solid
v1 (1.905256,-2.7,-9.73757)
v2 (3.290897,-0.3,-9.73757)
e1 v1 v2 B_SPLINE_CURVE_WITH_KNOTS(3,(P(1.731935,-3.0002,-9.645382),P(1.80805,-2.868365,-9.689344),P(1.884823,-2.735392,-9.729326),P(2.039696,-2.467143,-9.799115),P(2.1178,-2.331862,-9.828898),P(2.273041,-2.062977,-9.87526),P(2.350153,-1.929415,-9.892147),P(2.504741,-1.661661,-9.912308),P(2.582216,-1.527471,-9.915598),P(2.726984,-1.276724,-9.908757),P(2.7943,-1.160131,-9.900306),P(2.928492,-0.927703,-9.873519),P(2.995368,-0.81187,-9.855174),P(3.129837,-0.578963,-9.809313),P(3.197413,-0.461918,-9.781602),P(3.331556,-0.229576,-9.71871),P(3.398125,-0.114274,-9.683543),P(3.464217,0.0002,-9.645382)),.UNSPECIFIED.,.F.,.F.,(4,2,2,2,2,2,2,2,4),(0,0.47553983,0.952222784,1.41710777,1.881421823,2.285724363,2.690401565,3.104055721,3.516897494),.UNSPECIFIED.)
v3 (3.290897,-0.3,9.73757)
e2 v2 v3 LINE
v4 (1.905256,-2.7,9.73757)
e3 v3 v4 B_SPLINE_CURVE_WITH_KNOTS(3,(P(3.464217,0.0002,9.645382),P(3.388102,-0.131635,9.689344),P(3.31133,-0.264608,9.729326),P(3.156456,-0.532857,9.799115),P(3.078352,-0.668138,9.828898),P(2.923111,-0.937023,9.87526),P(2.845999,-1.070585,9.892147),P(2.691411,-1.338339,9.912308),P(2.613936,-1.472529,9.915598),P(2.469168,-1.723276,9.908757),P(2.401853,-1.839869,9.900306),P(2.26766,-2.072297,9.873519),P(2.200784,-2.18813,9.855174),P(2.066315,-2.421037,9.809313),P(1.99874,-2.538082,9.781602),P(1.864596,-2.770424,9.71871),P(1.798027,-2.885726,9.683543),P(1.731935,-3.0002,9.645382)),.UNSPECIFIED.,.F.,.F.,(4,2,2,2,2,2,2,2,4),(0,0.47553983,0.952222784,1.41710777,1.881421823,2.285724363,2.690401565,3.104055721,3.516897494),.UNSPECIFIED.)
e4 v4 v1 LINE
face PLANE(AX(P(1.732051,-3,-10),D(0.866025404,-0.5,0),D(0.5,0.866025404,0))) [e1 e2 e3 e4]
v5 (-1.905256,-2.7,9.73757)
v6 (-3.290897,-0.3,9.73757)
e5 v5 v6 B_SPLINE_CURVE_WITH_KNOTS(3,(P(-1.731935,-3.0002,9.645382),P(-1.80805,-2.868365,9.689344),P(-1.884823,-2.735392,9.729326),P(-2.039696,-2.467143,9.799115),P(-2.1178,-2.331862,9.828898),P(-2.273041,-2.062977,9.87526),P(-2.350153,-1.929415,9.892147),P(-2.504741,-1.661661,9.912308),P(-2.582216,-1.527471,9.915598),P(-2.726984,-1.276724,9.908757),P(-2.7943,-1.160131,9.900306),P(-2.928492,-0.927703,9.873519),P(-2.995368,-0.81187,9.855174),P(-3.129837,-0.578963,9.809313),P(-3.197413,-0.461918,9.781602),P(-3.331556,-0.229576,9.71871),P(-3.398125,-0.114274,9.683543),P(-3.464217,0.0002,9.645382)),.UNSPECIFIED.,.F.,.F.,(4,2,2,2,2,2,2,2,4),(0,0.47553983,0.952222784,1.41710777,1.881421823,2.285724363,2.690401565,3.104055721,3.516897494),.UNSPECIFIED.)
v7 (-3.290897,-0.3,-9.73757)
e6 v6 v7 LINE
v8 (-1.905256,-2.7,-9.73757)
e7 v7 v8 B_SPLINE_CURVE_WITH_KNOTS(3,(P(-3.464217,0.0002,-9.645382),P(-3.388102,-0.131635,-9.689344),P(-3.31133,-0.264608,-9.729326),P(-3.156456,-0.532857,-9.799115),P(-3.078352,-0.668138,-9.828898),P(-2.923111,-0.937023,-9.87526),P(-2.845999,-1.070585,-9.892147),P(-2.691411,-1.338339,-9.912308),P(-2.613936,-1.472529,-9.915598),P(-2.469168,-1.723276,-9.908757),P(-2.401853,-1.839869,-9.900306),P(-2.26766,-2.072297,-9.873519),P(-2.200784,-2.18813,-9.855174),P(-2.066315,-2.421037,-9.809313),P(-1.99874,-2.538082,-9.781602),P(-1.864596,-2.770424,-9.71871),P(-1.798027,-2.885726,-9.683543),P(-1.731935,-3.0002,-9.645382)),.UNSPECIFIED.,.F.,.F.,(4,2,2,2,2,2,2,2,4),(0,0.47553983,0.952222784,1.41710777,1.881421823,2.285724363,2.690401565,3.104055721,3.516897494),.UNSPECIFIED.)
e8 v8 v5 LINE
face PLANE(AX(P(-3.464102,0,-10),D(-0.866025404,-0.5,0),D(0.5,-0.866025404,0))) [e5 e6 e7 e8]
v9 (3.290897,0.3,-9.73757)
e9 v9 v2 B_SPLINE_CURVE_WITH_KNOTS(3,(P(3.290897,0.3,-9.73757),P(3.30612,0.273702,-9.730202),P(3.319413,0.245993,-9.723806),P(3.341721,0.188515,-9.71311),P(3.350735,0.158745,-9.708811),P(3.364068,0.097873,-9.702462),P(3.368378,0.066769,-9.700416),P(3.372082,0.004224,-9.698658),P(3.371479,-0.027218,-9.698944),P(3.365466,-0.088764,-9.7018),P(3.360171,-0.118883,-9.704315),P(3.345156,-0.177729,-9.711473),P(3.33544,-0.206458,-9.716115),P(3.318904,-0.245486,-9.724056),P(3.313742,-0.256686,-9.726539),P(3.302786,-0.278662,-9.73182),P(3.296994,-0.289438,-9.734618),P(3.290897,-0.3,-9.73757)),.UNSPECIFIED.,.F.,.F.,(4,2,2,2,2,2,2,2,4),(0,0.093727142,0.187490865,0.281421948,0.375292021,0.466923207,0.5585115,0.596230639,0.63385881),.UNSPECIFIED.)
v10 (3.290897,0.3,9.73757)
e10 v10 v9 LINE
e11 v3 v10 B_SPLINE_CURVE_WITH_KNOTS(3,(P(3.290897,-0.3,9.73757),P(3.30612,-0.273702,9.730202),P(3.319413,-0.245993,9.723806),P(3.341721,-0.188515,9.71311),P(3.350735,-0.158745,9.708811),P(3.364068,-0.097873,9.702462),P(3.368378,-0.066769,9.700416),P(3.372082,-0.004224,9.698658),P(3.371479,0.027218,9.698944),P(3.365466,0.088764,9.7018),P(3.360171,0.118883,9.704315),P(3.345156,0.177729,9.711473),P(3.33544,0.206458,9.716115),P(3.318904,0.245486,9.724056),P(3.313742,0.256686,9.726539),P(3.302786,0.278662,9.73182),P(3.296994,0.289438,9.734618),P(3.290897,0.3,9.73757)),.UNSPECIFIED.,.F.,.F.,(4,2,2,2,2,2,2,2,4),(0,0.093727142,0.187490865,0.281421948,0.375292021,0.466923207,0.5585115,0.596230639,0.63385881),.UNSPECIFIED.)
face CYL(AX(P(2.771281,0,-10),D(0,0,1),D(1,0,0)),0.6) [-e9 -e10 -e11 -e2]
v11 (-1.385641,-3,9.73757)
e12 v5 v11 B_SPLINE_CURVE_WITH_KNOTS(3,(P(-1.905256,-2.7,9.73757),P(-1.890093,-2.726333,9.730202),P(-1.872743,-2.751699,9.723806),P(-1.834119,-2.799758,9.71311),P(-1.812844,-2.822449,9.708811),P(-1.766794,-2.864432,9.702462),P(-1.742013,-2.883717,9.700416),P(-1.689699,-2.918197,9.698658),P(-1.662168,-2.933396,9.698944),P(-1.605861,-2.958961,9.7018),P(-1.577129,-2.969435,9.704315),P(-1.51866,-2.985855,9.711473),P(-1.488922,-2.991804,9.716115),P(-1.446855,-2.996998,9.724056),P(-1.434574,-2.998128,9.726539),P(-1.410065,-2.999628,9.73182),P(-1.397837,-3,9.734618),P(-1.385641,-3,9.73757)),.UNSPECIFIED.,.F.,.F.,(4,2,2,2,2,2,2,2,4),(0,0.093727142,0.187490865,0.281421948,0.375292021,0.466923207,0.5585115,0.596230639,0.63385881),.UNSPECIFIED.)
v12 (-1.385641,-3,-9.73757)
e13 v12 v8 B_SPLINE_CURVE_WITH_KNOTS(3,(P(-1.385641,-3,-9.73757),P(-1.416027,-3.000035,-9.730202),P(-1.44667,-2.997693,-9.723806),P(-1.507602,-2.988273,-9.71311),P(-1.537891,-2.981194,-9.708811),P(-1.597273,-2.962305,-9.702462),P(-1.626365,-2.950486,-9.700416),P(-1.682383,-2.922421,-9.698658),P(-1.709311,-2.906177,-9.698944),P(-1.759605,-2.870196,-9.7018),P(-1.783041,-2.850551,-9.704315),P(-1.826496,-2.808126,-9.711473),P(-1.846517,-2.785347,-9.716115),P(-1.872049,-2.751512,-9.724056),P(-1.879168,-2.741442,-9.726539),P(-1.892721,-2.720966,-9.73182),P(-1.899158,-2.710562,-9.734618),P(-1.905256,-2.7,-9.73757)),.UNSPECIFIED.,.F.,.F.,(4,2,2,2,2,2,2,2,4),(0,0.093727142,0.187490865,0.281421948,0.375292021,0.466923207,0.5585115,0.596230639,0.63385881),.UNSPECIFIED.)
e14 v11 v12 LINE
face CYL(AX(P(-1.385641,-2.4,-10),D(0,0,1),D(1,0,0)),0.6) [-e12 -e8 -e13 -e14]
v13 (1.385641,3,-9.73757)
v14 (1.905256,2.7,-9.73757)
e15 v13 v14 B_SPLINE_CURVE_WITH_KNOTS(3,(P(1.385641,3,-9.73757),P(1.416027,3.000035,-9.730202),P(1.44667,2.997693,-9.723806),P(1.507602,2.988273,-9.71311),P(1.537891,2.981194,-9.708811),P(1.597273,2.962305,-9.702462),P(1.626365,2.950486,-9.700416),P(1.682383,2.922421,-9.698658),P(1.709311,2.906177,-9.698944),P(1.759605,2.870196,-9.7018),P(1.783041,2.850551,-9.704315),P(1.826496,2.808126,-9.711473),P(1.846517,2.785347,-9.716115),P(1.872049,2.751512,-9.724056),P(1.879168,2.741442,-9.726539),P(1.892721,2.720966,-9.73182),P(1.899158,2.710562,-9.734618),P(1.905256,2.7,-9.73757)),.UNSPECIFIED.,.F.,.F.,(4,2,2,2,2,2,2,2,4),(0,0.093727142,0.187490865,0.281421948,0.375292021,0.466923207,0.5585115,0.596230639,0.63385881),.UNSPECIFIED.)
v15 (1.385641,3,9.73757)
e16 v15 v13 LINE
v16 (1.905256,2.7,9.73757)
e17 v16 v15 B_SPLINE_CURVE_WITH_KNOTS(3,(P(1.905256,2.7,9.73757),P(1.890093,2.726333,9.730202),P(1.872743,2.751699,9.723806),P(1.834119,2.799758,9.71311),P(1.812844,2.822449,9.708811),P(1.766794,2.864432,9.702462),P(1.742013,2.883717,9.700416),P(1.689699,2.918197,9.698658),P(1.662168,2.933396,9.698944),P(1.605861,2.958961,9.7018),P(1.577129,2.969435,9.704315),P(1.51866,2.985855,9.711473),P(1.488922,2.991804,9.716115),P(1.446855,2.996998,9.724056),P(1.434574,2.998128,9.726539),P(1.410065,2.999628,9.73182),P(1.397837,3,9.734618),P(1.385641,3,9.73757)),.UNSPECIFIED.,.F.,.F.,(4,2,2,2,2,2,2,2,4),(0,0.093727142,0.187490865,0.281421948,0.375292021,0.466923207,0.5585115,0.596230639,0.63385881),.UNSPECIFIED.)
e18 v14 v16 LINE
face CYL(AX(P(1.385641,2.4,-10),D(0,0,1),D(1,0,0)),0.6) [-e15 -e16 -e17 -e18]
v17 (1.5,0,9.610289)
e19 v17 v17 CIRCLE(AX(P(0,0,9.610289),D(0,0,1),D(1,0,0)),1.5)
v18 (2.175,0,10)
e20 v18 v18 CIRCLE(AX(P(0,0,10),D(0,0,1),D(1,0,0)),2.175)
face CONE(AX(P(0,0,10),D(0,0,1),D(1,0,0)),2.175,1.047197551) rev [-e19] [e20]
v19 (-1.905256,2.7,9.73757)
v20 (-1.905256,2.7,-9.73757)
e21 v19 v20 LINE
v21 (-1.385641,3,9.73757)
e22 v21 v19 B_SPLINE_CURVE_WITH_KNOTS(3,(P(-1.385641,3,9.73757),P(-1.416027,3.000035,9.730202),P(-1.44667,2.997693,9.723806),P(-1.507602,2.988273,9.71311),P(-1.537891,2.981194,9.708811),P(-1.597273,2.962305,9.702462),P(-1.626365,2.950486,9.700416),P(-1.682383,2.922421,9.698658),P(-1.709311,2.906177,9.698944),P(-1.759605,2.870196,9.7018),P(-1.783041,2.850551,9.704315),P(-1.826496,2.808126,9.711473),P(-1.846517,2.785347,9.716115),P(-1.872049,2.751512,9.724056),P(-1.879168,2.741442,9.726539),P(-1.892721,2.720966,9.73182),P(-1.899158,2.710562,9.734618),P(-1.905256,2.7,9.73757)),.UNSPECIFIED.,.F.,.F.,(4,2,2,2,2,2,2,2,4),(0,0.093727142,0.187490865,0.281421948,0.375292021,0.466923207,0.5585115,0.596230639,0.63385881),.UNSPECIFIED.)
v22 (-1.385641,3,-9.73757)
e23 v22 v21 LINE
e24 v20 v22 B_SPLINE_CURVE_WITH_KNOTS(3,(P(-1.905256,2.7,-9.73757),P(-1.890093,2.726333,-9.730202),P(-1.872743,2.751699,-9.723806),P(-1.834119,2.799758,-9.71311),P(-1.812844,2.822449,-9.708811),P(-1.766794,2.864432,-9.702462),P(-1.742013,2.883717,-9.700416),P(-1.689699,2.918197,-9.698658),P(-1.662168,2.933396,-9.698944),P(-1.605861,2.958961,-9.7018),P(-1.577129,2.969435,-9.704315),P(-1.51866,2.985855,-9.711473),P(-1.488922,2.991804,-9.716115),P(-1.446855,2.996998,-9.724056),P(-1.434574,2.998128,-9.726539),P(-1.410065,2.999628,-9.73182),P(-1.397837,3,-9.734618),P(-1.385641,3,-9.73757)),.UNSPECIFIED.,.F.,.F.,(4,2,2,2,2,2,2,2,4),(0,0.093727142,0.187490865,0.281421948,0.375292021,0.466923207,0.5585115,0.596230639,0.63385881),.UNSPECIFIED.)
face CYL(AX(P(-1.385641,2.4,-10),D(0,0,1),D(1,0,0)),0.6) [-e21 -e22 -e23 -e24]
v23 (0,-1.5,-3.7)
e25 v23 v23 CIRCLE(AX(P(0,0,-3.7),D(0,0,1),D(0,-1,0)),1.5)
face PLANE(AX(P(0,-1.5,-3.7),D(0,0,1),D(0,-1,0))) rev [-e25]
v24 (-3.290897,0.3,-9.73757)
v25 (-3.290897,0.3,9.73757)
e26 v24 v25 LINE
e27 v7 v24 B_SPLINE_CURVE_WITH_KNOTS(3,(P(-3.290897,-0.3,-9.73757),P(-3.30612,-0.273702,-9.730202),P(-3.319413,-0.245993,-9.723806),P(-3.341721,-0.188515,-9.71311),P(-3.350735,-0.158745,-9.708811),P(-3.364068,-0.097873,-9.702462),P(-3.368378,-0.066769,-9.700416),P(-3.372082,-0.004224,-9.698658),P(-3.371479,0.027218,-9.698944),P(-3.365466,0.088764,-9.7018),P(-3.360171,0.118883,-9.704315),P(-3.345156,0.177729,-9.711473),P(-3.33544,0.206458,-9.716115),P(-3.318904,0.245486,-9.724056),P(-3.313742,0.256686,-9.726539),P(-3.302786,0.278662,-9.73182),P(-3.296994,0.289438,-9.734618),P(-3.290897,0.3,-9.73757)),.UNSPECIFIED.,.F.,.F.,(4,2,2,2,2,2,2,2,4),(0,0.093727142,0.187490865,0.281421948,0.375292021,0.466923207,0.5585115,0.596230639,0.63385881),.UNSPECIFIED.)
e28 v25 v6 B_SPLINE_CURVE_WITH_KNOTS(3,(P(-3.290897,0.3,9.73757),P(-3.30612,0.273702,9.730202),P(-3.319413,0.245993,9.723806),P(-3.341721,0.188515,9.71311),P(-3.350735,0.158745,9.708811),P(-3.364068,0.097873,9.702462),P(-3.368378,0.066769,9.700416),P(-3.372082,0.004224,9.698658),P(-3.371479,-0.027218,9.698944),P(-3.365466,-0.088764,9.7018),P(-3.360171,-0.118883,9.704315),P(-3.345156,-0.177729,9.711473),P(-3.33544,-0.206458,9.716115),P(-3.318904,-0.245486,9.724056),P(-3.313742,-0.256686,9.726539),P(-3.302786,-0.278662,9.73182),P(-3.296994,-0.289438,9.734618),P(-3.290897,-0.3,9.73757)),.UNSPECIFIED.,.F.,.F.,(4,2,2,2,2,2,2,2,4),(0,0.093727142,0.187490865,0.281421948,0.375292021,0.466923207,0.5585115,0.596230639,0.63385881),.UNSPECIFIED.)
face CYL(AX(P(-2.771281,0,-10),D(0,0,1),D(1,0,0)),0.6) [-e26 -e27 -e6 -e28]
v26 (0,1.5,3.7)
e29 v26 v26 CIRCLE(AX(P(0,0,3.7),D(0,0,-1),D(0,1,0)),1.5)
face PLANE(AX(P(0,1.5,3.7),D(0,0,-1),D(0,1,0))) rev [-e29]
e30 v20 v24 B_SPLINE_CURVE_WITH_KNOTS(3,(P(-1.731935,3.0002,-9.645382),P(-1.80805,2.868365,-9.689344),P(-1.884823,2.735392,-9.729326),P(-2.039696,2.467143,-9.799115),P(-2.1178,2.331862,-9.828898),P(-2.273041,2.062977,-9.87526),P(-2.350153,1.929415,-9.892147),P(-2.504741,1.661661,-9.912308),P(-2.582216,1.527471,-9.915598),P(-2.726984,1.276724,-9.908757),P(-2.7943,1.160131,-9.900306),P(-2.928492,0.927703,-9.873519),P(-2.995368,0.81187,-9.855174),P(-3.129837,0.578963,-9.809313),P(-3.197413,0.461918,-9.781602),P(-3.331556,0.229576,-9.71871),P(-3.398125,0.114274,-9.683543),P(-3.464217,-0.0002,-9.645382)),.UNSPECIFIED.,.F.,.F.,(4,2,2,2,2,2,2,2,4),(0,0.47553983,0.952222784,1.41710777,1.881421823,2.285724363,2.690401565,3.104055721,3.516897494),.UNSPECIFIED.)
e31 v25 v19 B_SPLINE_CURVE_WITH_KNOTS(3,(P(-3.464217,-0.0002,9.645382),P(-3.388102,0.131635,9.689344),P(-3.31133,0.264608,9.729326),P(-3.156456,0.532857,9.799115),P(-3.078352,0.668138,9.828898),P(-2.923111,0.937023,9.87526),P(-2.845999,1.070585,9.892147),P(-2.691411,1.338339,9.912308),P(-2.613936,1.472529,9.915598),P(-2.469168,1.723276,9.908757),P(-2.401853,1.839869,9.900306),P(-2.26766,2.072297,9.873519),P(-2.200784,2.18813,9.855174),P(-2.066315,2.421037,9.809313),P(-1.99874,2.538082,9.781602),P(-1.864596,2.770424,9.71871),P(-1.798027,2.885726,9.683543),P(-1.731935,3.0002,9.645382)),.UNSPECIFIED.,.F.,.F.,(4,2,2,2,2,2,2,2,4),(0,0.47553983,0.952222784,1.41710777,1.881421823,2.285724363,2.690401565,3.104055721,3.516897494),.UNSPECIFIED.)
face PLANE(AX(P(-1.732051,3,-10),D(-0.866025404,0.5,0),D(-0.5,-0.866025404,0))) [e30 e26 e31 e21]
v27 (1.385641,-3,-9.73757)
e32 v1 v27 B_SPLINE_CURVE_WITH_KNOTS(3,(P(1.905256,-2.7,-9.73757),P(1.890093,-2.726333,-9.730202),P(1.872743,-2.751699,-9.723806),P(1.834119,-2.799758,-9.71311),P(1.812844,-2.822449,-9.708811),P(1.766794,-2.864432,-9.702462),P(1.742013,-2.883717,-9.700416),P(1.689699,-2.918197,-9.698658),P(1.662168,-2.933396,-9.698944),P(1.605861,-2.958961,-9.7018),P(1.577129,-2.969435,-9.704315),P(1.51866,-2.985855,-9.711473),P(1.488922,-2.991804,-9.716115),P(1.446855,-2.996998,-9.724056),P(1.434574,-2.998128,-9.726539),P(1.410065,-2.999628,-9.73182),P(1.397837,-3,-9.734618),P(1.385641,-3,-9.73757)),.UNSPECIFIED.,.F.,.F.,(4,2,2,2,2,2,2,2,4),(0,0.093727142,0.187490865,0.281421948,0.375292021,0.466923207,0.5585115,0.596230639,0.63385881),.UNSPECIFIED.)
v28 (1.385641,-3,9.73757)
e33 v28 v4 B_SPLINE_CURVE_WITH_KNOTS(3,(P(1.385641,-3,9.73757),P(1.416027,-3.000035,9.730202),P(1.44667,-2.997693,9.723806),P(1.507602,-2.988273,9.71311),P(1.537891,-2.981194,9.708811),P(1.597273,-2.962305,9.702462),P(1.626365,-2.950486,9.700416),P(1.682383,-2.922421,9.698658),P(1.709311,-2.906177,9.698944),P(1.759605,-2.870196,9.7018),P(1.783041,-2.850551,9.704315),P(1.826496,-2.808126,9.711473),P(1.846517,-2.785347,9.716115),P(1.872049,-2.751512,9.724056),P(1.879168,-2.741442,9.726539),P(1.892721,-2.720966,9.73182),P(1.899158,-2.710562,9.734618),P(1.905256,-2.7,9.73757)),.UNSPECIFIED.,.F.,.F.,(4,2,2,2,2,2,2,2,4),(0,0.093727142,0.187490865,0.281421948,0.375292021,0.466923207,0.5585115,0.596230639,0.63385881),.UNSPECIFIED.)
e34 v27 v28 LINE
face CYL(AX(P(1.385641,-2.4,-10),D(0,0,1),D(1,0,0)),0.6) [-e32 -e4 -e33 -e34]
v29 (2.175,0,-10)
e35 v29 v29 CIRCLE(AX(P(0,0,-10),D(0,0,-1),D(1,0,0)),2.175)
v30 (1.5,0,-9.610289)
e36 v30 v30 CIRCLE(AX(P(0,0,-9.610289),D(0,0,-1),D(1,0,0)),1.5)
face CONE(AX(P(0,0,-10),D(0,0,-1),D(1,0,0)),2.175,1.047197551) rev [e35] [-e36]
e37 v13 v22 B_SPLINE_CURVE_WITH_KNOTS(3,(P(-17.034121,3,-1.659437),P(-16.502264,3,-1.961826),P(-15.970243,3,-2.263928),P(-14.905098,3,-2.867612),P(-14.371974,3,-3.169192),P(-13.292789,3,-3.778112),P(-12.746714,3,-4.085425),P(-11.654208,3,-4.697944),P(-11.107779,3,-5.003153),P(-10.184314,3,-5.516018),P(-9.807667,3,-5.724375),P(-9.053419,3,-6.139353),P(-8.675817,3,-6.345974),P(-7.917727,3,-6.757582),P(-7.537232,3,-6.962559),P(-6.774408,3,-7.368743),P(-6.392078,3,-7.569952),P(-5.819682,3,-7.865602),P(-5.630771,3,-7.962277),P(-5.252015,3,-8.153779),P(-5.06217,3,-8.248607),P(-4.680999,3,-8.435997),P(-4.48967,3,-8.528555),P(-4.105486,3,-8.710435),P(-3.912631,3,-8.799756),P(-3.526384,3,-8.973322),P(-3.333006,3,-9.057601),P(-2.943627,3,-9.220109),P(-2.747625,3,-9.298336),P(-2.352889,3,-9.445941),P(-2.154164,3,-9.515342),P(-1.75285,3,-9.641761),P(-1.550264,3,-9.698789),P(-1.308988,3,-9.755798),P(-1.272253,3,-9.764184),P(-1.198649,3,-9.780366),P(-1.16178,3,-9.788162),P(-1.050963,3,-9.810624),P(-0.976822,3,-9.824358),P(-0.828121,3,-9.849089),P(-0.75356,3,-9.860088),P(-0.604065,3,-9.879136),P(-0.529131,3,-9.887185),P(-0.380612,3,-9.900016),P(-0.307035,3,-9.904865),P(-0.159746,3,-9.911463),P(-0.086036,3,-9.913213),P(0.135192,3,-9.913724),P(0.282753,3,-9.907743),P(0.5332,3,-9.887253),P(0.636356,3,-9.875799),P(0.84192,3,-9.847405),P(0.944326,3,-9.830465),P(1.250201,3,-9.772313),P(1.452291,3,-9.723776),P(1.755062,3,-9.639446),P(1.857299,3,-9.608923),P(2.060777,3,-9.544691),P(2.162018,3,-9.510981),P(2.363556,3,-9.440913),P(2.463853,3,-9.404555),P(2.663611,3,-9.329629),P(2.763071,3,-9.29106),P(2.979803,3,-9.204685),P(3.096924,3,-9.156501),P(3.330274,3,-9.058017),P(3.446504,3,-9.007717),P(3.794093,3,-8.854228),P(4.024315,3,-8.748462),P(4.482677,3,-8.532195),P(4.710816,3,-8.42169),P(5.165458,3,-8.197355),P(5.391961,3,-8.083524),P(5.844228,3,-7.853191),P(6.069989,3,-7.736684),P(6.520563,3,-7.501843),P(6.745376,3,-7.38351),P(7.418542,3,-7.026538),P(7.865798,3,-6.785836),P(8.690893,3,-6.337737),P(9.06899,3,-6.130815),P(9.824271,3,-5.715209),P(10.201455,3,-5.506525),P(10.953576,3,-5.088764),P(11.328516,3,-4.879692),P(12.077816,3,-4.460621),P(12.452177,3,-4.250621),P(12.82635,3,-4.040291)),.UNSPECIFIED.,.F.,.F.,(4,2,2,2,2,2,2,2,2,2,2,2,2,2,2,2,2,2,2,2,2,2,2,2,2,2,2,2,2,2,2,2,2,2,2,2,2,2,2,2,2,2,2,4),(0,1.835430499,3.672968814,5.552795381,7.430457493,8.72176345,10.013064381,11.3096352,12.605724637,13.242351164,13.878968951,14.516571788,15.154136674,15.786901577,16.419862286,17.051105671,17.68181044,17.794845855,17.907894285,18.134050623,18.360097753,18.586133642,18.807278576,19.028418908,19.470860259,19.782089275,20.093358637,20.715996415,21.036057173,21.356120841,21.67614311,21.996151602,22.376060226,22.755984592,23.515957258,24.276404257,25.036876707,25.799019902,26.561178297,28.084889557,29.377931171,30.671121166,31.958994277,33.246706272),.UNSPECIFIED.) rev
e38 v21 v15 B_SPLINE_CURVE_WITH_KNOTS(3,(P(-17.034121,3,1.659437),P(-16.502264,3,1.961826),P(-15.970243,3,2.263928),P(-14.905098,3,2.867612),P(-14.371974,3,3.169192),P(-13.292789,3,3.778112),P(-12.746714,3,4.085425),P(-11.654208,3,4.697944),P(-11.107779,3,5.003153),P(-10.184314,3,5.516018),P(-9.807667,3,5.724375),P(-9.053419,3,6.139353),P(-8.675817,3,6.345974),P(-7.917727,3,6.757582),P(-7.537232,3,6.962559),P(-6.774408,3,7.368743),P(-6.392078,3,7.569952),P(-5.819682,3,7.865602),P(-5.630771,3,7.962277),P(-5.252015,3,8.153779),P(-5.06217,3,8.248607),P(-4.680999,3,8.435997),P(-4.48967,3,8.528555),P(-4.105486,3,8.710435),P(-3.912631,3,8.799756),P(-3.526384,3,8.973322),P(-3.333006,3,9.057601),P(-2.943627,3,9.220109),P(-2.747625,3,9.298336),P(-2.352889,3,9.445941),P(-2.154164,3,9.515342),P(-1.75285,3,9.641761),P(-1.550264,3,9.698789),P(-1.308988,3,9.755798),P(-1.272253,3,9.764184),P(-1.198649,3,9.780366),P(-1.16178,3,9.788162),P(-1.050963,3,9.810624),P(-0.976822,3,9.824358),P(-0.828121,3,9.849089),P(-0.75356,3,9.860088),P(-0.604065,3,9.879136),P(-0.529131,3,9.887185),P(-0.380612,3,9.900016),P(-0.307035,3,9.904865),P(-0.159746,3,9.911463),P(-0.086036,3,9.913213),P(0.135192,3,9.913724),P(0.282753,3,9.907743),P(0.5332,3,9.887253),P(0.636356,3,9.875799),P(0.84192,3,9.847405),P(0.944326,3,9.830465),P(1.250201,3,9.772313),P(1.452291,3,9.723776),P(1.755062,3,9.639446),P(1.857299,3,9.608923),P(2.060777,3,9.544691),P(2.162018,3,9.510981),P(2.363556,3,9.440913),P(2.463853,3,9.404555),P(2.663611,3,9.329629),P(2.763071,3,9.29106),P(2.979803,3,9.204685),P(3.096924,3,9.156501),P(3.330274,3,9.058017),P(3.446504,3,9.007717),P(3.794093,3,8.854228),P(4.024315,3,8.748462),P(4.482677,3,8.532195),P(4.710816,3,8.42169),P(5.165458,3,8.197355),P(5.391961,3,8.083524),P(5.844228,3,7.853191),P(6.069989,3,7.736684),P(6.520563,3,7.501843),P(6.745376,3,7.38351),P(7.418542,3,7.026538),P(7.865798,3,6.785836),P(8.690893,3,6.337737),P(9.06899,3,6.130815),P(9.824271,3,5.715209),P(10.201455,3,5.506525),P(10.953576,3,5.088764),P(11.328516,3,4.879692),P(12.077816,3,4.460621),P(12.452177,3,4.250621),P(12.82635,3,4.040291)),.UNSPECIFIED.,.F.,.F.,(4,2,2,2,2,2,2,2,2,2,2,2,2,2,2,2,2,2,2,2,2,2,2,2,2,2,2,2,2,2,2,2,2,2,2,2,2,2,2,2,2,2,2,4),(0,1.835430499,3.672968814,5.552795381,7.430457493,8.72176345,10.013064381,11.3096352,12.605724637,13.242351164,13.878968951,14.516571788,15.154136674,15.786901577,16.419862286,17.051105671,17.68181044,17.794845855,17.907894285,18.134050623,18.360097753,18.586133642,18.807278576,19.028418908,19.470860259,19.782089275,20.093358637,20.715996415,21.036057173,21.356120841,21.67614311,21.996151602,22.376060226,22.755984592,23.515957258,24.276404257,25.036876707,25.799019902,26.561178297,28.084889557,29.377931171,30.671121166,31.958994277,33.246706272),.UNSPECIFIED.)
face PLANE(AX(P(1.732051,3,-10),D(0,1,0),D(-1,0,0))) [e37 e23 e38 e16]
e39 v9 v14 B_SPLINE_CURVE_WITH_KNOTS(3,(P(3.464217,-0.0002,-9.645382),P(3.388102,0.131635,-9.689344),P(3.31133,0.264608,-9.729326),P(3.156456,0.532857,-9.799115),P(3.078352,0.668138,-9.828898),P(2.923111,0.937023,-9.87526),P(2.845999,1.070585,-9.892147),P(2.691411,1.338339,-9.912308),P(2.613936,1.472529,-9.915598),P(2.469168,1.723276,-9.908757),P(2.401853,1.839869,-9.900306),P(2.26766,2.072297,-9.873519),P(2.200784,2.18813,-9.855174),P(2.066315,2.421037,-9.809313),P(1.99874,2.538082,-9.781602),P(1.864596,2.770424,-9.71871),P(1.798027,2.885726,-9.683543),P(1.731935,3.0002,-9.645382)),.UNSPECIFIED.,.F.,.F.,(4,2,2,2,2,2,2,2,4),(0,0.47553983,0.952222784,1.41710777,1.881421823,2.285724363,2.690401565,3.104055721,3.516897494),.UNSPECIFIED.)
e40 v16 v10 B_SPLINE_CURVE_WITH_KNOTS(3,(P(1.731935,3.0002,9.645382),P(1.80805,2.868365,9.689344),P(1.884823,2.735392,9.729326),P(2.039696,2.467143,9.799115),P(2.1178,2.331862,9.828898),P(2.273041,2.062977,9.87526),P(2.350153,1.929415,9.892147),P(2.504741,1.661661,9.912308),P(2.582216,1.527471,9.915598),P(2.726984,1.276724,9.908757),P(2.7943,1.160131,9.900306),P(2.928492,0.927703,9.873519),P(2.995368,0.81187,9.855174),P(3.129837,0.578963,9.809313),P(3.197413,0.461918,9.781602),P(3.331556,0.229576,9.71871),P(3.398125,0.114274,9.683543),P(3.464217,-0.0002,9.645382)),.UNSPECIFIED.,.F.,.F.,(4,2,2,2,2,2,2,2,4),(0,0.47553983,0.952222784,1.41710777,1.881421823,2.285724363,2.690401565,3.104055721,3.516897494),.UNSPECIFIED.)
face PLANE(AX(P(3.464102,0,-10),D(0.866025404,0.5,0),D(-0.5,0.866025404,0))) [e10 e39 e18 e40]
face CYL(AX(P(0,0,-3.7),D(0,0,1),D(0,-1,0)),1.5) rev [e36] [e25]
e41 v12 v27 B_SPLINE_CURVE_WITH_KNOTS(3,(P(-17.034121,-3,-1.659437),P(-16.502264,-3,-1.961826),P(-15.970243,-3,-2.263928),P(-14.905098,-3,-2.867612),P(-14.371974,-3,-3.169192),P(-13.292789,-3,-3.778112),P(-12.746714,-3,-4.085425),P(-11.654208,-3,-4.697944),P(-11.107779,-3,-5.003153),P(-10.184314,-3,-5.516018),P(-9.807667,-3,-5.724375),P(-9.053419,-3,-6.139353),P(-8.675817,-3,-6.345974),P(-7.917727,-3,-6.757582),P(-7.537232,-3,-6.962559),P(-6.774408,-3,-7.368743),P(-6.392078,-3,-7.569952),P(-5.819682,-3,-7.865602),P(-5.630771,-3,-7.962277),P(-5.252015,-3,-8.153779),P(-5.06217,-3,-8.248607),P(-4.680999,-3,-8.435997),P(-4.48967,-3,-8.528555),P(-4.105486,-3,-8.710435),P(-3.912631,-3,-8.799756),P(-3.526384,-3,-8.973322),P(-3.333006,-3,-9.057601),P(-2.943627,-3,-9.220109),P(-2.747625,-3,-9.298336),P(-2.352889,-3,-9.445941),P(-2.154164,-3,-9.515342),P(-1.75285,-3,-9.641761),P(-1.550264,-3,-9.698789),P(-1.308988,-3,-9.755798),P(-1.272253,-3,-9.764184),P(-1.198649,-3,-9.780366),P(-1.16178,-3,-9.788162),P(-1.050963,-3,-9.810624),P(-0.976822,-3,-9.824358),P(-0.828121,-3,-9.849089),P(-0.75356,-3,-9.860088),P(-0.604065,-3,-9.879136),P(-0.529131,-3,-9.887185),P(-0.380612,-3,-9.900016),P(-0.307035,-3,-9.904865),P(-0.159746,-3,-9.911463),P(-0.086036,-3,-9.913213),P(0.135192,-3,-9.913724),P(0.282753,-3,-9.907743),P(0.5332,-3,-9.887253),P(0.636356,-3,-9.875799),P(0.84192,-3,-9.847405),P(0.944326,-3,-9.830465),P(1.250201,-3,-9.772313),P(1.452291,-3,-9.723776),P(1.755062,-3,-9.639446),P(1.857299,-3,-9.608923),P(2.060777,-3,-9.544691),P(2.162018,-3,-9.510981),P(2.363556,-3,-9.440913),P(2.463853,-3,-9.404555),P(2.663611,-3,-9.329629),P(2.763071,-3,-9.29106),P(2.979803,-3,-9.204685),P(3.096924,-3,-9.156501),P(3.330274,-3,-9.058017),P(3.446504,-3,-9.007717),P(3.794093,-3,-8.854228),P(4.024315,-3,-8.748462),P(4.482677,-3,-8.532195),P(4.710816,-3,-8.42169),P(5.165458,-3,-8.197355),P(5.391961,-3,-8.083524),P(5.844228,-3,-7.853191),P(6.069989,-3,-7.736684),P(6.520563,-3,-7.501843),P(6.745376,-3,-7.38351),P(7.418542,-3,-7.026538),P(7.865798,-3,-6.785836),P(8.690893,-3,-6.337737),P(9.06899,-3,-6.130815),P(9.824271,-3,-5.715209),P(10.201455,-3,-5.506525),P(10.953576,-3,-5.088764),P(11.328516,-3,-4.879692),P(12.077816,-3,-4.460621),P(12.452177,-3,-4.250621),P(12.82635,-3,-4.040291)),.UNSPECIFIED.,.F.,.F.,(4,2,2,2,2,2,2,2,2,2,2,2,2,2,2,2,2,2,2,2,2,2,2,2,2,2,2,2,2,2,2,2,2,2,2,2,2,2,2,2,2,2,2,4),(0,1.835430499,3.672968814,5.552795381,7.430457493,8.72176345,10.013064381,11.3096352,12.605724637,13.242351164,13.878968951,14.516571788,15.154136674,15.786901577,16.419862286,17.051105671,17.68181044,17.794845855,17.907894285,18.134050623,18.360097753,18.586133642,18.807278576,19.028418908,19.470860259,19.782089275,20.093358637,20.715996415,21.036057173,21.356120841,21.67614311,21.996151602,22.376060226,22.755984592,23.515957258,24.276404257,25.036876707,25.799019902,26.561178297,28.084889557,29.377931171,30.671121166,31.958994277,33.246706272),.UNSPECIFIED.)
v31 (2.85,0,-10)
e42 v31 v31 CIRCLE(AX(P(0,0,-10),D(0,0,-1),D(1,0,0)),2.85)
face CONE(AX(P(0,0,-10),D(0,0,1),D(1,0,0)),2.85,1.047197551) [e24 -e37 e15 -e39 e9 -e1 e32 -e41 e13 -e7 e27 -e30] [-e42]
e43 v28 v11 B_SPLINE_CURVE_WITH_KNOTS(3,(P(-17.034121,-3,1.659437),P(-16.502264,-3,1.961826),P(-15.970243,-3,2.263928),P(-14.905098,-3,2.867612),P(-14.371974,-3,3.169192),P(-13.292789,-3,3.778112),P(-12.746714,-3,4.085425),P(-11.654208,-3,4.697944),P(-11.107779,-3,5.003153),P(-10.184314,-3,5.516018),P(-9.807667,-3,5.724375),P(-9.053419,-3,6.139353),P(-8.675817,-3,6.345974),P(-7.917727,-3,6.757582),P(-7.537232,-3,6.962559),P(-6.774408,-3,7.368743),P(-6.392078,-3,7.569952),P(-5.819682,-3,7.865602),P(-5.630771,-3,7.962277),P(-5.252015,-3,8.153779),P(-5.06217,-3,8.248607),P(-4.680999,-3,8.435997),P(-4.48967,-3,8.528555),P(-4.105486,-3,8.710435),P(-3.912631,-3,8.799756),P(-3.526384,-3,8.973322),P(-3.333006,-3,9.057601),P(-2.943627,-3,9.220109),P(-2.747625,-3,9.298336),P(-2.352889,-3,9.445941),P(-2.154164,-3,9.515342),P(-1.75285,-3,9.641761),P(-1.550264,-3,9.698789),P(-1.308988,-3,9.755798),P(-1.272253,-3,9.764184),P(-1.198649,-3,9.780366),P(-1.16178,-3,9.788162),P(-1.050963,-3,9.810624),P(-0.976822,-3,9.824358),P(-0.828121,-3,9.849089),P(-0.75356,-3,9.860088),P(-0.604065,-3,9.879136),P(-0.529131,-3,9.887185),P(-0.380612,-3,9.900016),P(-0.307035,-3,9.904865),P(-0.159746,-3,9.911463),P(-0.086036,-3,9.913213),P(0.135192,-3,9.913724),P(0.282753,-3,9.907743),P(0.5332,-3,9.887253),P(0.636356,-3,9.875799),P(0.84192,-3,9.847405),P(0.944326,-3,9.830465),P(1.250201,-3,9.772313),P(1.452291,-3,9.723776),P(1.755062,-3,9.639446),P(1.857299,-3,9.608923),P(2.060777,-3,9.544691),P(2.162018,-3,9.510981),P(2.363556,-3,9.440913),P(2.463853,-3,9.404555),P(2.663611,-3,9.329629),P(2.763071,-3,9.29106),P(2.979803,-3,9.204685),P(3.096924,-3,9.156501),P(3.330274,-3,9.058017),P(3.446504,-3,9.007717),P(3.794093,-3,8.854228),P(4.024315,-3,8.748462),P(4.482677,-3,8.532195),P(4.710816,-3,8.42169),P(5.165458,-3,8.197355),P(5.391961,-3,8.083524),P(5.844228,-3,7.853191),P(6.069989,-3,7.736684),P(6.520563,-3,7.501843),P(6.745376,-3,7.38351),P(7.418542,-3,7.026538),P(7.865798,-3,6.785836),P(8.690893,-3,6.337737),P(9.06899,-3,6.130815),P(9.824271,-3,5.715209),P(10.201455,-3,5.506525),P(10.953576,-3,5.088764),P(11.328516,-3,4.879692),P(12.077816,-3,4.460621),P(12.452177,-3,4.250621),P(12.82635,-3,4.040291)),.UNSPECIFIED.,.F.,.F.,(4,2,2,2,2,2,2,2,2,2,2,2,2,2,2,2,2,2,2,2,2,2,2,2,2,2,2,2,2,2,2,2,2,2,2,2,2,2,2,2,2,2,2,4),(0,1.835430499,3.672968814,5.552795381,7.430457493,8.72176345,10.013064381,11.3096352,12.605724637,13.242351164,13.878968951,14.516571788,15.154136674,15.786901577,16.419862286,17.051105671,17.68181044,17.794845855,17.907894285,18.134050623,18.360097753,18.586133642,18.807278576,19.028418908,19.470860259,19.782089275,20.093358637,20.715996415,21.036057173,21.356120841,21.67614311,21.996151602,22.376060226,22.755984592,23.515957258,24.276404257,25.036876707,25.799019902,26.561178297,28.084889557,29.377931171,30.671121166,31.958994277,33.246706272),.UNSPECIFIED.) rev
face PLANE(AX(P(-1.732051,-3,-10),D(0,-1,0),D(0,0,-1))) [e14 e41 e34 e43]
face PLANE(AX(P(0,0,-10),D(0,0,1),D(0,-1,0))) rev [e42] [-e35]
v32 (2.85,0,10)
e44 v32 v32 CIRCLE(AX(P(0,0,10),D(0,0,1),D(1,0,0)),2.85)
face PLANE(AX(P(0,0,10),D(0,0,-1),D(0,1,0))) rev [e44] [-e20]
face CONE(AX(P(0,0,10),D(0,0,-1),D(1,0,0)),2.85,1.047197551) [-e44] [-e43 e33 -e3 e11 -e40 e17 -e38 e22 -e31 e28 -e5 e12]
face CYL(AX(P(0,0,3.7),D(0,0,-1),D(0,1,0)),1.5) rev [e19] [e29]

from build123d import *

# Parameters (mm, degrees)
SKETCH4_R           = 2.25
BOSS_EXTRUDE1_DEPTH = 10
SKETCH5_OUTSIDE_W   = 87.87
SKETCH5_OUTSIDE_H   = 86.942
SKETCH5_OUTSIDE_R   = 2.85
CUT_EXTRUDE1_DEPTH  = 21.518284529
CUT_EXTRUDE1_DRAFT  = -60
SKETCH6_OUTSIDE_W   = 87.87
SKETCH6_OUTSIDE_H   = 86.942
SKETCH6_OUTSIDE_R   = 2.85
CUT_EXTRUDE2_DEPTH  = 21.518284529
CUT_EXTRUDE2_DRAFT  = -60
FILLET1_R           = 0.6
BOSS_EXTRUDE2_START = -10
SKETCH7_R           = 2.175
BOSS_EXTRUDE2_DEPTH = 6.3
SKETCH8_W           = 6.3
SKETCH8_H           = 1.5
CIRPATTERN1_COUNT   = 2


with BuildPart() as part:
    # Sketch3 → Revolve1 (revolve)
    with BuildSketch(Plane(origin=(0, 0, 0), x_dir=(0, 0, -1), z_dir=(1, 0, 0))):
        Polygon((-9.610288568, 1.5), (-3.7, 1.5), (-3.7, 0), (3.7, 0), (3.7, 1.5), (9.610288568, 1.5), (10, 2.175), (10, 3), (0, 3), (-10, 3), (-10, 2.175), align=None)
        Polygon((-9.610288568, 1.5), (-3.7, 1.5), (-3.7, 0), (3.7, 0), (3.7, 1.5), (9.610288568, 1.5), (10, 2.175), (10, 3), (0, 3), (-10, 3), (-10, 2.175), align=None)
    revolve(axis=Axis((0, 0, 3.7), (0, 0, 1)))

    # Sketch4 → Boss-Extrude1 (add, symmetric)
    with BuildSketch(Plane.XY):
        Polygon((-1.732050808, 3), (-3.464101615, 0), (-1.732050808, -3), (1.732050808, -3), (3.464101615, 0), (1.732050808, 3), align=None)
        Circle(SKETCH4_R, mode=Mode.SUBTRACT)
    extrude(amount=BOSS_EXTRUDE1_DEPTH, both=True)


with BuildPart() as cut_extrude1_tool:
    # Sketch5 outside → Cut-Extrude1 (with draft: the straight prism first)
    with BuildSketch(Plane.XY.offset(10)):
        Rectangle(SKETCH5_OUTSIDE_W, SKETCH5_OUTSIDE_H)
        Circle(SKETCH5_OUTSIDE_R, mode=Mode.SUBTRACT)
    extrude(amount=-CUT_EXTRUDE1_DEPTH)
    # Cut-Extrude1: the draft: its side faces are tilted about the plane it starts from
    cut_extrude1_sides = [cut_extrude1_tool.faces().sort_by_distance(p)[0] for p in [
        (0, -43.471, -0.759142264),
        (43.935, 0, -0.759142264),
        (0, 43.471, -0.759142264),
        (-43.935, 0, -0.759142264),
        (-2.85, 0, -0.759142264),
    ]]
    draft(cut_extrude1_sides, Plane.XY.offset(10), CUT_EXTRUDE1_DRAFT)


with BuildPart() as part_1:
    add(part.part)

    # Cut-Extrude1: cut by cut_extrude1_tool
    add(cut_extrude1_tool.part, mode=Mode.SUBTRACT)


with BuildPart() as cut_extrude2_tool:
    # Sketch6 outside → Cut-Extrude2 (with draft: the straight prism first)
    with BuildSketch(Plane(origin=(0, 0, -10), x_dir=(-1, 0, 0), z_dir=(0, 0, -1))):
        Rectangle(SKETCH6_OUTSIDE_W, SKETCH6_OUTSIDE_H)
        Circle(SKETCH6_OUTSIDE_R, mode=Mode.SUBTRACT)
    extrude(amount=-CUT_EXTRUDE2_DEPTH)
    # Cut-Extrude2: the draft: its side faces are tilted about the plane it starts from
    cut_extrude2_sides = [cut_extrude2_tool.faces().sort_by_distance(p)[0] for p in [
        (0, -43.471, 0.759142264),
        (-43.935, 0, 0.759142264),
        (0, 43.471, 0.759142264),
        (43.935, 0, 0.759142264),
        (2.85, 0, 0.759142264),
    ]]
    draft(cut_extrude2_sides, Plane(origin=(0, 0, -10), x_dir=(-1, 0, 0), z_dir=(0, 0, -1)), CUT_EXTRUDE2_DRAFT)


with BuildPart() as part_2:
    add(part_1.part)

    # Cut-Extrude2: cut by cut_extrude2_tool
    add(cut_extrude2_tool.part, mode=Mode.SUBTRACT)

    # Fillet1
    # the kernel refuses this fillet: 0.6 mm, written as the material it takes off along each edge
    with BuildSketch(Plane(origin=(1.732050808, 3, 10.511473671), x_dir=(-1, 0, 0), z_dir=(0, 0, -1)), Plane(origin=(-1.732050808, 3, 10.511473671), x_dir=(-0.5000000000000006, -0.8660254037844383, 0), z_dir=(0, 0, -1))) as fillet1_piece_1:
        with BuildLine():
            CenterArc((FILLET1_R * 0.57735026919, -FILLET1_R), FILLET1_R, 90, 60)
            Line((-FILLET1_R * 0.288675134595, -FILLET1_R * 0.5), (0, 0))
            Line((0, 0), (FILLET1_R * 0.57735026919, 0))
        make_face()
    extrude(amount=21.022947342, mode=Mode.SUBTRACT)
    with BuildSketch(Plane(origin=(-3.464101615, 0, -10.511473671), x_dir=(0.5000000000000008, -0.8660254037844383, 0), z_dir=(0, 0, 1)), Plane(origin=(-1.732050808, -3, -10.511473671), x_dir=(1, 0, 0), z_dir=(0, 0, 1)), Plane(origin=(1.732050808, -3, -10.511473671), x_dir=(0.5000000000000001, 0.8660254037844386, 0), z_dir=(0, 0, 1)), Plane(origin=(3.464101615, 0, 10.511473671), x_dir=(-0.4999999999999995, -0.8660254037844388, 0), z_dir=(0, 0, -1))) as fillet1_piece_2:
        with BuildLine():
            CenterArc((FILLET1_R * 0.57735026919, FILLET1_R), FILLET1_R, 210, 60)
            Line((-FILLET1_R * 0.288675134595, FILLET1_R * 0.5), (0, 0))
            Line((0, 0), (FILLET1_R * 0.57735026919, 0))
        make_face()
    extrude(amount=21.022947342, mode=Mode.SUBTRACT)

    # Sketch7 → Boss-Extrude2 (add)
    with BuildSketch(Plane(origin=(0, 0, 0), x_dir=(-1, 0, 0), z_dir=(0, 0, -1)).offset(BOSS_EXTRUDE2_START)):
        Circle(SKETCH7_R)
    extrude(amount=BOSS_EXTRUDE2_DEPTH)

    # SurfaceCut1
    split(bisect_by=Plane.XY, keep=Keep.TOP)


with BuildPart() as body_2:
    # Sketch8 → Revolve2 (revolve)
    with BuildSketch(Plane(origin=(0, 0, 0), x_dir=(0, 0, -1), z_dir=(1, 0, 0))):
        with Locations((-6.85, 0.75)):
            Rectangle(SKETCH8_W, SKETCH8_H)
    revolve(axis=Axis((0, 0, 3.7), (0, 0, 1)))


with BuildPart() as part_3:
    add(part_2.part)

    # Combine1: cut body 2
    add(body_2.part, mode=Mode.SUBTRACT)

    # Cut-Extrude3 cone 1 section (through the dimple's axis) → Cut-Extrude3 (revolve, cut)
    with BuildSketch(Plane(origin=(0, 0, 10), x_dir=(0, -1, 0), z_dir=(1, 0, 0))):
        Polygon((0, 0), (2.175, 0), (0, 1.255736835), align=None)
    revolve(axis=Axis((0, 0, 10), (0, 0, -1)), mode=Mode.SUBTRACT)


with BuildPart() as cirpattern1_1:
    # CirPattern1: pattern copy
    add(part_3.part.rotate(Axis((0, 0, 0), (1, 0, 0)), 1 * 360 / CIRPATTERN1_COUNT))


with BuildPart() as part_4:
    add(part_3.part)

    # Combine2: union CirPattern1_1
    add(cirpattern1_1.part)


solid = part_4.part
